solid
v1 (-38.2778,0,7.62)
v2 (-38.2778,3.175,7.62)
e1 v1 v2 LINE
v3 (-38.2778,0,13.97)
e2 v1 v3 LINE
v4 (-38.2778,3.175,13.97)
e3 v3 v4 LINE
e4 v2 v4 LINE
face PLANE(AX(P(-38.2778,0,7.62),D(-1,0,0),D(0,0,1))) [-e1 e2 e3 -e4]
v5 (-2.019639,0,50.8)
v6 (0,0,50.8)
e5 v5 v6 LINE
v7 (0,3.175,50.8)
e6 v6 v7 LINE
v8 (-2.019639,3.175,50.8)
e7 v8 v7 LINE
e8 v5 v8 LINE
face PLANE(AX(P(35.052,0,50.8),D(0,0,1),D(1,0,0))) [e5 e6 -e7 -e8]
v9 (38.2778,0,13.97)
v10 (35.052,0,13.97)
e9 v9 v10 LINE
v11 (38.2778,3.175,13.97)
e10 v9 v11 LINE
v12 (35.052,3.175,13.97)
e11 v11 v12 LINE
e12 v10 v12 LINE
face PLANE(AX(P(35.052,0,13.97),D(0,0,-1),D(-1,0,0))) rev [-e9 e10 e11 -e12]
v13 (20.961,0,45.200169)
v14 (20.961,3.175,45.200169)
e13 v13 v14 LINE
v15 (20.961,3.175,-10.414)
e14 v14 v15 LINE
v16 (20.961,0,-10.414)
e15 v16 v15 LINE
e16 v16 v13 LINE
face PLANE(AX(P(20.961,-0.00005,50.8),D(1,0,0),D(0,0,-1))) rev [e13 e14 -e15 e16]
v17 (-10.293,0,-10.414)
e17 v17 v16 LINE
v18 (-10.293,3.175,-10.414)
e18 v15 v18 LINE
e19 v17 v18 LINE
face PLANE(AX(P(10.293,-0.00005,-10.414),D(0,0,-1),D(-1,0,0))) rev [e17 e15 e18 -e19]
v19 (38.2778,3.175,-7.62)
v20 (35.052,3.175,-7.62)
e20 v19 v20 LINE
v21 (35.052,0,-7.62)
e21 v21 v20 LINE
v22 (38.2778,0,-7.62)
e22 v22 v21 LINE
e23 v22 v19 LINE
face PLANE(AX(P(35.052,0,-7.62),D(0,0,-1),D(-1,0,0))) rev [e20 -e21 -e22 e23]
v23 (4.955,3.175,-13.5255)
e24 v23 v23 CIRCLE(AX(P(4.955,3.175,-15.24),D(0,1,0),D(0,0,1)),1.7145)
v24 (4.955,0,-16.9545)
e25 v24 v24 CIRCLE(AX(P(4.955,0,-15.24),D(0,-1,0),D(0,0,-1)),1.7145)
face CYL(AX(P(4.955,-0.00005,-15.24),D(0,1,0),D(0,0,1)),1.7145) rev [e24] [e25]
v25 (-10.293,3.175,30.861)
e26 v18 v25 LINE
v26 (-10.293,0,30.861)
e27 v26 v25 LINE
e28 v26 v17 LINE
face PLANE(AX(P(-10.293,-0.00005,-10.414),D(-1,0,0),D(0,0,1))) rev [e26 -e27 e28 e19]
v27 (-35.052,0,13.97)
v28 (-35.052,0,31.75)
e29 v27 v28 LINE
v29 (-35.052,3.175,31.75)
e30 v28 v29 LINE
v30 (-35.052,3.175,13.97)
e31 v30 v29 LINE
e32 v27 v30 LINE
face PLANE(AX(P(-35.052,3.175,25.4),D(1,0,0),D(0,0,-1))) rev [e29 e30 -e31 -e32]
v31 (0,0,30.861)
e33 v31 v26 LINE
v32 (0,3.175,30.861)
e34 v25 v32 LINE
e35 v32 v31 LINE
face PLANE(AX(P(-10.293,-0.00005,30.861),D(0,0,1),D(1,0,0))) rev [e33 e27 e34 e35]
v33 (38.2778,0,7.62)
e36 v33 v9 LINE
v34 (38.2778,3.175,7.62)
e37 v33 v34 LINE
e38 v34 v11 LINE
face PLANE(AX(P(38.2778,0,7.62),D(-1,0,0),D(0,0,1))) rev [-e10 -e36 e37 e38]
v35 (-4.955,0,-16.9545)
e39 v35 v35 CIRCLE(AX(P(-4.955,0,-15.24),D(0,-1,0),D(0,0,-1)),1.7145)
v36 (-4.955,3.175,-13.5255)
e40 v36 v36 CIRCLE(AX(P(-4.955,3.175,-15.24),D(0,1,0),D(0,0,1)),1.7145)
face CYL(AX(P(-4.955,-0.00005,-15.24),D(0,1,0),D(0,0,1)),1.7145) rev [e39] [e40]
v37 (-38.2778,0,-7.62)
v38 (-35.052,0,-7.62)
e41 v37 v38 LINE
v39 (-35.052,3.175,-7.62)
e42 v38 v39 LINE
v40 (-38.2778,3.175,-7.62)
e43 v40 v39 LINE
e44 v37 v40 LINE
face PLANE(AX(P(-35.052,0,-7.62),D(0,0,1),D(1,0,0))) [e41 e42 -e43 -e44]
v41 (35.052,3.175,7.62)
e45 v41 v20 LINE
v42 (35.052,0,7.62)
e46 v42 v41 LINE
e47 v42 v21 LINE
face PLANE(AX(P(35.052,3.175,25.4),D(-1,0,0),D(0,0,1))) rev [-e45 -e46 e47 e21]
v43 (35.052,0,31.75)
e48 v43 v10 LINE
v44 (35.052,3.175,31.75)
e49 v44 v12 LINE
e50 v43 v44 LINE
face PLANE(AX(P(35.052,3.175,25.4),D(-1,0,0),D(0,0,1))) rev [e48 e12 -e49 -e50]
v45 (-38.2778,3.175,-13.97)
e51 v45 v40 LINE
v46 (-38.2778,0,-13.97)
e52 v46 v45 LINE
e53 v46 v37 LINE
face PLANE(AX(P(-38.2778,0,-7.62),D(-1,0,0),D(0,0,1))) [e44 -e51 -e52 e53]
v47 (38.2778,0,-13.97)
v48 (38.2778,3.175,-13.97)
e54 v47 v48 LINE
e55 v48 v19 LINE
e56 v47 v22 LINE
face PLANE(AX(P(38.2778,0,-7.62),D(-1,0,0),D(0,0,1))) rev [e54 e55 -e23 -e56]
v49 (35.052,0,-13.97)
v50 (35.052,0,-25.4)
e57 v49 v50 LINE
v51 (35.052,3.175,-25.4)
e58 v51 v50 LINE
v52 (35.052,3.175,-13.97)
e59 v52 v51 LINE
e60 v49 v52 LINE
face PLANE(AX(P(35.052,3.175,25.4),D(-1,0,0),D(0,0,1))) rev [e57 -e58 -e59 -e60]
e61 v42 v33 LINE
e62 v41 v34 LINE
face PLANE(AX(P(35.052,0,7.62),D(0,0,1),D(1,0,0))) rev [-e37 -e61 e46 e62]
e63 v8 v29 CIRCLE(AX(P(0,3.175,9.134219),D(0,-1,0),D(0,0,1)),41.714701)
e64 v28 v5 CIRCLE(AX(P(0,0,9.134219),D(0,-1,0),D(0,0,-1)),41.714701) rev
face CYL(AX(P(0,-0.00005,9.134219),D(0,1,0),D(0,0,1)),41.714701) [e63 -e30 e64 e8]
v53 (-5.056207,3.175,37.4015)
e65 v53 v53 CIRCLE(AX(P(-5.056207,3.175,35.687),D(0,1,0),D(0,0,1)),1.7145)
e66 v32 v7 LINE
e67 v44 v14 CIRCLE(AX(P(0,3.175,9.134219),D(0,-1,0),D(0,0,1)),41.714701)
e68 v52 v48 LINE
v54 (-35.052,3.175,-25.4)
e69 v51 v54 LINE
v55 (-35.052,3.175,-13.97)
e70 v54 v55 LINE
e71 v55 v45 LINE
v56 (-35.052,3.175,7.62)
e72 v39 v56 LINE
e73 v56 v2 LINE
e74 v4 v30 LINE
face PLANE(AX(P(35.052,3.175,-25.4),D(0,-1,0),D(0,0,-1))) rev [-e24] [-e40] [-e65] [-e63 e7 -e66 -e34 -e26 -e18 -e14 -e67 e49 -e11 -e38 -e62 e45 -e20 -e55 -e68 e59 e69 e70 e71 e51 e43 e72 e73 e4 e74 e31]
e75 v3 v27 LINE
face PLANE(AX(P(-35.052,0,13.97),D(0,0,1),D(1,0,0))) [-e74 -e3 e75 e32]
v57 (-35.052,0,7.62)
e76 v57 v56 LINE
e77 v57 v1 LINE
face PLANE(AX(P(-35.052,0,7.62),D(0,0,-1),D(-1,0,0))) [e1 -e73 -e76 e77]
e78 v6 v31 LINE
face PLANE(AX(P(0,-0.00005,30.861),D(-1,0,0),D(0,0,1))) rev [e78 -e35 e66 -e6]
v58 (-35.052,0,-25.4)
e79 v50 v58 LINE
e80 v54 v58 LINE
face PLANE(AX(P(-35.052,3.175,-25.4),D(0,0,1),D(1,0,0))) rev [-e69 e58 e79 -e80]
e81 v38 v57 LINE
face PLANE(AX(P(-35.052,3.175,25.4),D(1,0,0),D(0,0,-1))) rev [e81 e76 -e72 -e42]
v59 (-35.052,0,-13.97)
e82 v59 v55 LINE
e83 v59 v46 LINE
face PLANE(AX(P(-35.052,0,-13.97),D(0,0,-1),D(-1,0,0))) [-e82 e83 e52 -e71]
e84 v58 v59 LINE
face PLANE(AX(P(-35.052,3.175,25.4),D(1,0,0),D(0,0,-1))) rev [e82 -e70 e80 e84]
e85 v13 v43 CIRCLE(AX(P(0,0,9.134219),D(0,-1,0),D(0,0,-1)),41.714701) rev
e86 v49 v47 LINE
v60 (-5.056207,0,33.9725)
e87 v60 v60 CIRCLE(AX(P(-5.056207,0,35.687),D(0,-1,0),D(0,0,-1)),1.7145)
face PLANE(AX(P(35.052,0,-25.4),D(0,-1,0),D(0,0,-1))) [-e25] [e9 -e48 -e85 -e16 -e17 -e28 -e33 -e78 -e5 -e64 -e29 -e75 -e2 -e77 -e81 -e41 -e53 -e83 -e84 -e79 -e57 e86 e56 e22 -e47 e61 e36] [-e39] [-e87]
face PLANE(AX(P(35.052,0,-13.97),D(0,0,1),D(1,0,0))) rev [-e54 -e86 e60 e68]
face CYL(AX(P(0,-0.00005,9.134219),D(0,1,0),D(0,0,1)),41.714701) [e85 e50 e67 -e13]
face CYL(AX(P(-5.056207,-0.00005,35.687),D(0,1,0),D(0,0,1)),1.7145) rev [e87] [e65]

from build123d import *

# Parameters (mm, degrees)
SKETCH1_W              = 70.104
SKETCH1_H              = 50.8
RECTANGULAR_BASE_DEPTH = 3.175
SKETCH4_W              = 3.2258
SKETCH4_H              = 6.35
TAB_DEPTH              = 3.175
SKETCH8_W              = 70.104
SKETCH8_H              = 25.4
BOSS_EXTRUDE2_DEPTH    = 3.175
CUT_EXTRUDE2_OUTLINE_R = 1.7145
CUT_EXTRUDE2_OUTLINE_W = 20.586
CUT_EXTRUDE2_OUTLINE_H = 41.275
CUT_EXTRUDE2_DEPTH     = 3.175
CUT_EXTRUDE3_DEPTH     = 64.686031419
CUT_EXTRUDE4_DEPTH     = 64.686031419


# Read off the part's stored shape, not the designer's step: Cut-Extrude2
with BuildPart() as part:
    # Sketch1 → rectangular base (new body)
    with BuildSketch(Plane(origin=(0, 0, 0), x_dir=(1, 0, 0), z_dir=(0, 1, 0))):
        Rectangle(SKETCH1_W, SKETCH1_H)
    extrude(amount=RECTANGULAR_BASE_DEPTH)

    # Sketch4 → tab (add)
    with BuildSketch(Plane(origin=(0, 3.175, 0), x_dir=(1, 0, 0), z_dir=(0, 1, 0))):
        with Locations((-36.6649, 10.795)):
            Rectangle(SKETCH4_W, SKETCH4_H)
        with Locations((-36.6649, -10.795)):
            Rectangle(SKETCH4_W, SKETCH4_H)
    tab = extrude(amount=-TAB_DEPTH)

    # Mirror1: tab across plane
    add(tab.mirror(Plane(origin=(0, 0, 0), x_dir=(0, 0, 1), z_dir=(1, 0, 0))))

    # Sketch8 → Boss-Extrude2 (add)
    with BuildSketch(Plane(origin=(0, 3.175, 0), x_dir=(1, 0, 0), z_dir=(0, 1, 0))):
        with Locations((0, -38.1)):
            Rectangle(SKETCH8_W, SKETCH8_H)
    extrude(amount=-BOSS_EXTRUDE2_DEPTH)

    # Cut-Extrude2 outline → Cut-Extrude2 (cut)
    with BuildSketch(Plane(origin=(0, 0, 0), x_dir=(1, 0, 0), z_dir=(0, 1, 0))):
        with Locations((4.955, 15.24)):
            Circle(CUT_EXTRUDE2_OUTLINE_R)
        with Locations((-4.955, 15.24)):
            Circle(CUT_EXTRUDE2_OUTLINE_R)
        with Locations((4.853793359, -35.687)):
            Circle(CUT_EXTRUDE2_OUTLINE_R)
        with Locations((-5.056206641, -35.687)):
            Circle(CUT_EXTRUDE2_OUTLINE_R)
        with Locations((0, -10.2235)):
            Rectangle(CUT_EXTRUDE2_OUTLINE_W, CUT_EXTRUDE2_OUTLINE_H)
    extrude(amount=CUT_EXTRUDE2_DEPTH, mode=Mode.SUBTRACT)

    # Sketch9 → Cut-Extrude3 (cut, through all)
    with BuildSketch(Plane(origin=(0, 3.175, 0), x_dir=(1, 0, 0), z_dir=(0, 1, 0))):
        Polygon((0, -30.861), (0, -50.8), (10.293, -50.8), (20.961, -50.8), (20.961, 10.414), (10.293, 10.414), (10.293, -30.861), align=None)
    extrude(amount=-CUT_EXTRUDE3_DEPTH, mode=Mode.SUBTRACT)

    # Sketch10 → Cut-Extrude4 (cut, through all)
    with BuildSketch(Plane(origin=(0, 3.175, 0), x_dir=(1, 0, 0), z_dir=(0, 1, 0))):
        with BuildLine():
            Line((-35.052, -31.75), (-35.052, -60.151970588))
            Line((-35.052, -60.151970588), (35.052, -60.151970588))
            Line((35.052, -60.151970588), (35.052, -31.75))
            ThreePointArc((35.052, -31.75), (0, -50.84891964), (-35.052, -31.75))
        make_face()
    extrude(amount=-CUT_EXTRUDE4_DEPTH, mode=Mode.SUBTRACT)


solid = part.part
